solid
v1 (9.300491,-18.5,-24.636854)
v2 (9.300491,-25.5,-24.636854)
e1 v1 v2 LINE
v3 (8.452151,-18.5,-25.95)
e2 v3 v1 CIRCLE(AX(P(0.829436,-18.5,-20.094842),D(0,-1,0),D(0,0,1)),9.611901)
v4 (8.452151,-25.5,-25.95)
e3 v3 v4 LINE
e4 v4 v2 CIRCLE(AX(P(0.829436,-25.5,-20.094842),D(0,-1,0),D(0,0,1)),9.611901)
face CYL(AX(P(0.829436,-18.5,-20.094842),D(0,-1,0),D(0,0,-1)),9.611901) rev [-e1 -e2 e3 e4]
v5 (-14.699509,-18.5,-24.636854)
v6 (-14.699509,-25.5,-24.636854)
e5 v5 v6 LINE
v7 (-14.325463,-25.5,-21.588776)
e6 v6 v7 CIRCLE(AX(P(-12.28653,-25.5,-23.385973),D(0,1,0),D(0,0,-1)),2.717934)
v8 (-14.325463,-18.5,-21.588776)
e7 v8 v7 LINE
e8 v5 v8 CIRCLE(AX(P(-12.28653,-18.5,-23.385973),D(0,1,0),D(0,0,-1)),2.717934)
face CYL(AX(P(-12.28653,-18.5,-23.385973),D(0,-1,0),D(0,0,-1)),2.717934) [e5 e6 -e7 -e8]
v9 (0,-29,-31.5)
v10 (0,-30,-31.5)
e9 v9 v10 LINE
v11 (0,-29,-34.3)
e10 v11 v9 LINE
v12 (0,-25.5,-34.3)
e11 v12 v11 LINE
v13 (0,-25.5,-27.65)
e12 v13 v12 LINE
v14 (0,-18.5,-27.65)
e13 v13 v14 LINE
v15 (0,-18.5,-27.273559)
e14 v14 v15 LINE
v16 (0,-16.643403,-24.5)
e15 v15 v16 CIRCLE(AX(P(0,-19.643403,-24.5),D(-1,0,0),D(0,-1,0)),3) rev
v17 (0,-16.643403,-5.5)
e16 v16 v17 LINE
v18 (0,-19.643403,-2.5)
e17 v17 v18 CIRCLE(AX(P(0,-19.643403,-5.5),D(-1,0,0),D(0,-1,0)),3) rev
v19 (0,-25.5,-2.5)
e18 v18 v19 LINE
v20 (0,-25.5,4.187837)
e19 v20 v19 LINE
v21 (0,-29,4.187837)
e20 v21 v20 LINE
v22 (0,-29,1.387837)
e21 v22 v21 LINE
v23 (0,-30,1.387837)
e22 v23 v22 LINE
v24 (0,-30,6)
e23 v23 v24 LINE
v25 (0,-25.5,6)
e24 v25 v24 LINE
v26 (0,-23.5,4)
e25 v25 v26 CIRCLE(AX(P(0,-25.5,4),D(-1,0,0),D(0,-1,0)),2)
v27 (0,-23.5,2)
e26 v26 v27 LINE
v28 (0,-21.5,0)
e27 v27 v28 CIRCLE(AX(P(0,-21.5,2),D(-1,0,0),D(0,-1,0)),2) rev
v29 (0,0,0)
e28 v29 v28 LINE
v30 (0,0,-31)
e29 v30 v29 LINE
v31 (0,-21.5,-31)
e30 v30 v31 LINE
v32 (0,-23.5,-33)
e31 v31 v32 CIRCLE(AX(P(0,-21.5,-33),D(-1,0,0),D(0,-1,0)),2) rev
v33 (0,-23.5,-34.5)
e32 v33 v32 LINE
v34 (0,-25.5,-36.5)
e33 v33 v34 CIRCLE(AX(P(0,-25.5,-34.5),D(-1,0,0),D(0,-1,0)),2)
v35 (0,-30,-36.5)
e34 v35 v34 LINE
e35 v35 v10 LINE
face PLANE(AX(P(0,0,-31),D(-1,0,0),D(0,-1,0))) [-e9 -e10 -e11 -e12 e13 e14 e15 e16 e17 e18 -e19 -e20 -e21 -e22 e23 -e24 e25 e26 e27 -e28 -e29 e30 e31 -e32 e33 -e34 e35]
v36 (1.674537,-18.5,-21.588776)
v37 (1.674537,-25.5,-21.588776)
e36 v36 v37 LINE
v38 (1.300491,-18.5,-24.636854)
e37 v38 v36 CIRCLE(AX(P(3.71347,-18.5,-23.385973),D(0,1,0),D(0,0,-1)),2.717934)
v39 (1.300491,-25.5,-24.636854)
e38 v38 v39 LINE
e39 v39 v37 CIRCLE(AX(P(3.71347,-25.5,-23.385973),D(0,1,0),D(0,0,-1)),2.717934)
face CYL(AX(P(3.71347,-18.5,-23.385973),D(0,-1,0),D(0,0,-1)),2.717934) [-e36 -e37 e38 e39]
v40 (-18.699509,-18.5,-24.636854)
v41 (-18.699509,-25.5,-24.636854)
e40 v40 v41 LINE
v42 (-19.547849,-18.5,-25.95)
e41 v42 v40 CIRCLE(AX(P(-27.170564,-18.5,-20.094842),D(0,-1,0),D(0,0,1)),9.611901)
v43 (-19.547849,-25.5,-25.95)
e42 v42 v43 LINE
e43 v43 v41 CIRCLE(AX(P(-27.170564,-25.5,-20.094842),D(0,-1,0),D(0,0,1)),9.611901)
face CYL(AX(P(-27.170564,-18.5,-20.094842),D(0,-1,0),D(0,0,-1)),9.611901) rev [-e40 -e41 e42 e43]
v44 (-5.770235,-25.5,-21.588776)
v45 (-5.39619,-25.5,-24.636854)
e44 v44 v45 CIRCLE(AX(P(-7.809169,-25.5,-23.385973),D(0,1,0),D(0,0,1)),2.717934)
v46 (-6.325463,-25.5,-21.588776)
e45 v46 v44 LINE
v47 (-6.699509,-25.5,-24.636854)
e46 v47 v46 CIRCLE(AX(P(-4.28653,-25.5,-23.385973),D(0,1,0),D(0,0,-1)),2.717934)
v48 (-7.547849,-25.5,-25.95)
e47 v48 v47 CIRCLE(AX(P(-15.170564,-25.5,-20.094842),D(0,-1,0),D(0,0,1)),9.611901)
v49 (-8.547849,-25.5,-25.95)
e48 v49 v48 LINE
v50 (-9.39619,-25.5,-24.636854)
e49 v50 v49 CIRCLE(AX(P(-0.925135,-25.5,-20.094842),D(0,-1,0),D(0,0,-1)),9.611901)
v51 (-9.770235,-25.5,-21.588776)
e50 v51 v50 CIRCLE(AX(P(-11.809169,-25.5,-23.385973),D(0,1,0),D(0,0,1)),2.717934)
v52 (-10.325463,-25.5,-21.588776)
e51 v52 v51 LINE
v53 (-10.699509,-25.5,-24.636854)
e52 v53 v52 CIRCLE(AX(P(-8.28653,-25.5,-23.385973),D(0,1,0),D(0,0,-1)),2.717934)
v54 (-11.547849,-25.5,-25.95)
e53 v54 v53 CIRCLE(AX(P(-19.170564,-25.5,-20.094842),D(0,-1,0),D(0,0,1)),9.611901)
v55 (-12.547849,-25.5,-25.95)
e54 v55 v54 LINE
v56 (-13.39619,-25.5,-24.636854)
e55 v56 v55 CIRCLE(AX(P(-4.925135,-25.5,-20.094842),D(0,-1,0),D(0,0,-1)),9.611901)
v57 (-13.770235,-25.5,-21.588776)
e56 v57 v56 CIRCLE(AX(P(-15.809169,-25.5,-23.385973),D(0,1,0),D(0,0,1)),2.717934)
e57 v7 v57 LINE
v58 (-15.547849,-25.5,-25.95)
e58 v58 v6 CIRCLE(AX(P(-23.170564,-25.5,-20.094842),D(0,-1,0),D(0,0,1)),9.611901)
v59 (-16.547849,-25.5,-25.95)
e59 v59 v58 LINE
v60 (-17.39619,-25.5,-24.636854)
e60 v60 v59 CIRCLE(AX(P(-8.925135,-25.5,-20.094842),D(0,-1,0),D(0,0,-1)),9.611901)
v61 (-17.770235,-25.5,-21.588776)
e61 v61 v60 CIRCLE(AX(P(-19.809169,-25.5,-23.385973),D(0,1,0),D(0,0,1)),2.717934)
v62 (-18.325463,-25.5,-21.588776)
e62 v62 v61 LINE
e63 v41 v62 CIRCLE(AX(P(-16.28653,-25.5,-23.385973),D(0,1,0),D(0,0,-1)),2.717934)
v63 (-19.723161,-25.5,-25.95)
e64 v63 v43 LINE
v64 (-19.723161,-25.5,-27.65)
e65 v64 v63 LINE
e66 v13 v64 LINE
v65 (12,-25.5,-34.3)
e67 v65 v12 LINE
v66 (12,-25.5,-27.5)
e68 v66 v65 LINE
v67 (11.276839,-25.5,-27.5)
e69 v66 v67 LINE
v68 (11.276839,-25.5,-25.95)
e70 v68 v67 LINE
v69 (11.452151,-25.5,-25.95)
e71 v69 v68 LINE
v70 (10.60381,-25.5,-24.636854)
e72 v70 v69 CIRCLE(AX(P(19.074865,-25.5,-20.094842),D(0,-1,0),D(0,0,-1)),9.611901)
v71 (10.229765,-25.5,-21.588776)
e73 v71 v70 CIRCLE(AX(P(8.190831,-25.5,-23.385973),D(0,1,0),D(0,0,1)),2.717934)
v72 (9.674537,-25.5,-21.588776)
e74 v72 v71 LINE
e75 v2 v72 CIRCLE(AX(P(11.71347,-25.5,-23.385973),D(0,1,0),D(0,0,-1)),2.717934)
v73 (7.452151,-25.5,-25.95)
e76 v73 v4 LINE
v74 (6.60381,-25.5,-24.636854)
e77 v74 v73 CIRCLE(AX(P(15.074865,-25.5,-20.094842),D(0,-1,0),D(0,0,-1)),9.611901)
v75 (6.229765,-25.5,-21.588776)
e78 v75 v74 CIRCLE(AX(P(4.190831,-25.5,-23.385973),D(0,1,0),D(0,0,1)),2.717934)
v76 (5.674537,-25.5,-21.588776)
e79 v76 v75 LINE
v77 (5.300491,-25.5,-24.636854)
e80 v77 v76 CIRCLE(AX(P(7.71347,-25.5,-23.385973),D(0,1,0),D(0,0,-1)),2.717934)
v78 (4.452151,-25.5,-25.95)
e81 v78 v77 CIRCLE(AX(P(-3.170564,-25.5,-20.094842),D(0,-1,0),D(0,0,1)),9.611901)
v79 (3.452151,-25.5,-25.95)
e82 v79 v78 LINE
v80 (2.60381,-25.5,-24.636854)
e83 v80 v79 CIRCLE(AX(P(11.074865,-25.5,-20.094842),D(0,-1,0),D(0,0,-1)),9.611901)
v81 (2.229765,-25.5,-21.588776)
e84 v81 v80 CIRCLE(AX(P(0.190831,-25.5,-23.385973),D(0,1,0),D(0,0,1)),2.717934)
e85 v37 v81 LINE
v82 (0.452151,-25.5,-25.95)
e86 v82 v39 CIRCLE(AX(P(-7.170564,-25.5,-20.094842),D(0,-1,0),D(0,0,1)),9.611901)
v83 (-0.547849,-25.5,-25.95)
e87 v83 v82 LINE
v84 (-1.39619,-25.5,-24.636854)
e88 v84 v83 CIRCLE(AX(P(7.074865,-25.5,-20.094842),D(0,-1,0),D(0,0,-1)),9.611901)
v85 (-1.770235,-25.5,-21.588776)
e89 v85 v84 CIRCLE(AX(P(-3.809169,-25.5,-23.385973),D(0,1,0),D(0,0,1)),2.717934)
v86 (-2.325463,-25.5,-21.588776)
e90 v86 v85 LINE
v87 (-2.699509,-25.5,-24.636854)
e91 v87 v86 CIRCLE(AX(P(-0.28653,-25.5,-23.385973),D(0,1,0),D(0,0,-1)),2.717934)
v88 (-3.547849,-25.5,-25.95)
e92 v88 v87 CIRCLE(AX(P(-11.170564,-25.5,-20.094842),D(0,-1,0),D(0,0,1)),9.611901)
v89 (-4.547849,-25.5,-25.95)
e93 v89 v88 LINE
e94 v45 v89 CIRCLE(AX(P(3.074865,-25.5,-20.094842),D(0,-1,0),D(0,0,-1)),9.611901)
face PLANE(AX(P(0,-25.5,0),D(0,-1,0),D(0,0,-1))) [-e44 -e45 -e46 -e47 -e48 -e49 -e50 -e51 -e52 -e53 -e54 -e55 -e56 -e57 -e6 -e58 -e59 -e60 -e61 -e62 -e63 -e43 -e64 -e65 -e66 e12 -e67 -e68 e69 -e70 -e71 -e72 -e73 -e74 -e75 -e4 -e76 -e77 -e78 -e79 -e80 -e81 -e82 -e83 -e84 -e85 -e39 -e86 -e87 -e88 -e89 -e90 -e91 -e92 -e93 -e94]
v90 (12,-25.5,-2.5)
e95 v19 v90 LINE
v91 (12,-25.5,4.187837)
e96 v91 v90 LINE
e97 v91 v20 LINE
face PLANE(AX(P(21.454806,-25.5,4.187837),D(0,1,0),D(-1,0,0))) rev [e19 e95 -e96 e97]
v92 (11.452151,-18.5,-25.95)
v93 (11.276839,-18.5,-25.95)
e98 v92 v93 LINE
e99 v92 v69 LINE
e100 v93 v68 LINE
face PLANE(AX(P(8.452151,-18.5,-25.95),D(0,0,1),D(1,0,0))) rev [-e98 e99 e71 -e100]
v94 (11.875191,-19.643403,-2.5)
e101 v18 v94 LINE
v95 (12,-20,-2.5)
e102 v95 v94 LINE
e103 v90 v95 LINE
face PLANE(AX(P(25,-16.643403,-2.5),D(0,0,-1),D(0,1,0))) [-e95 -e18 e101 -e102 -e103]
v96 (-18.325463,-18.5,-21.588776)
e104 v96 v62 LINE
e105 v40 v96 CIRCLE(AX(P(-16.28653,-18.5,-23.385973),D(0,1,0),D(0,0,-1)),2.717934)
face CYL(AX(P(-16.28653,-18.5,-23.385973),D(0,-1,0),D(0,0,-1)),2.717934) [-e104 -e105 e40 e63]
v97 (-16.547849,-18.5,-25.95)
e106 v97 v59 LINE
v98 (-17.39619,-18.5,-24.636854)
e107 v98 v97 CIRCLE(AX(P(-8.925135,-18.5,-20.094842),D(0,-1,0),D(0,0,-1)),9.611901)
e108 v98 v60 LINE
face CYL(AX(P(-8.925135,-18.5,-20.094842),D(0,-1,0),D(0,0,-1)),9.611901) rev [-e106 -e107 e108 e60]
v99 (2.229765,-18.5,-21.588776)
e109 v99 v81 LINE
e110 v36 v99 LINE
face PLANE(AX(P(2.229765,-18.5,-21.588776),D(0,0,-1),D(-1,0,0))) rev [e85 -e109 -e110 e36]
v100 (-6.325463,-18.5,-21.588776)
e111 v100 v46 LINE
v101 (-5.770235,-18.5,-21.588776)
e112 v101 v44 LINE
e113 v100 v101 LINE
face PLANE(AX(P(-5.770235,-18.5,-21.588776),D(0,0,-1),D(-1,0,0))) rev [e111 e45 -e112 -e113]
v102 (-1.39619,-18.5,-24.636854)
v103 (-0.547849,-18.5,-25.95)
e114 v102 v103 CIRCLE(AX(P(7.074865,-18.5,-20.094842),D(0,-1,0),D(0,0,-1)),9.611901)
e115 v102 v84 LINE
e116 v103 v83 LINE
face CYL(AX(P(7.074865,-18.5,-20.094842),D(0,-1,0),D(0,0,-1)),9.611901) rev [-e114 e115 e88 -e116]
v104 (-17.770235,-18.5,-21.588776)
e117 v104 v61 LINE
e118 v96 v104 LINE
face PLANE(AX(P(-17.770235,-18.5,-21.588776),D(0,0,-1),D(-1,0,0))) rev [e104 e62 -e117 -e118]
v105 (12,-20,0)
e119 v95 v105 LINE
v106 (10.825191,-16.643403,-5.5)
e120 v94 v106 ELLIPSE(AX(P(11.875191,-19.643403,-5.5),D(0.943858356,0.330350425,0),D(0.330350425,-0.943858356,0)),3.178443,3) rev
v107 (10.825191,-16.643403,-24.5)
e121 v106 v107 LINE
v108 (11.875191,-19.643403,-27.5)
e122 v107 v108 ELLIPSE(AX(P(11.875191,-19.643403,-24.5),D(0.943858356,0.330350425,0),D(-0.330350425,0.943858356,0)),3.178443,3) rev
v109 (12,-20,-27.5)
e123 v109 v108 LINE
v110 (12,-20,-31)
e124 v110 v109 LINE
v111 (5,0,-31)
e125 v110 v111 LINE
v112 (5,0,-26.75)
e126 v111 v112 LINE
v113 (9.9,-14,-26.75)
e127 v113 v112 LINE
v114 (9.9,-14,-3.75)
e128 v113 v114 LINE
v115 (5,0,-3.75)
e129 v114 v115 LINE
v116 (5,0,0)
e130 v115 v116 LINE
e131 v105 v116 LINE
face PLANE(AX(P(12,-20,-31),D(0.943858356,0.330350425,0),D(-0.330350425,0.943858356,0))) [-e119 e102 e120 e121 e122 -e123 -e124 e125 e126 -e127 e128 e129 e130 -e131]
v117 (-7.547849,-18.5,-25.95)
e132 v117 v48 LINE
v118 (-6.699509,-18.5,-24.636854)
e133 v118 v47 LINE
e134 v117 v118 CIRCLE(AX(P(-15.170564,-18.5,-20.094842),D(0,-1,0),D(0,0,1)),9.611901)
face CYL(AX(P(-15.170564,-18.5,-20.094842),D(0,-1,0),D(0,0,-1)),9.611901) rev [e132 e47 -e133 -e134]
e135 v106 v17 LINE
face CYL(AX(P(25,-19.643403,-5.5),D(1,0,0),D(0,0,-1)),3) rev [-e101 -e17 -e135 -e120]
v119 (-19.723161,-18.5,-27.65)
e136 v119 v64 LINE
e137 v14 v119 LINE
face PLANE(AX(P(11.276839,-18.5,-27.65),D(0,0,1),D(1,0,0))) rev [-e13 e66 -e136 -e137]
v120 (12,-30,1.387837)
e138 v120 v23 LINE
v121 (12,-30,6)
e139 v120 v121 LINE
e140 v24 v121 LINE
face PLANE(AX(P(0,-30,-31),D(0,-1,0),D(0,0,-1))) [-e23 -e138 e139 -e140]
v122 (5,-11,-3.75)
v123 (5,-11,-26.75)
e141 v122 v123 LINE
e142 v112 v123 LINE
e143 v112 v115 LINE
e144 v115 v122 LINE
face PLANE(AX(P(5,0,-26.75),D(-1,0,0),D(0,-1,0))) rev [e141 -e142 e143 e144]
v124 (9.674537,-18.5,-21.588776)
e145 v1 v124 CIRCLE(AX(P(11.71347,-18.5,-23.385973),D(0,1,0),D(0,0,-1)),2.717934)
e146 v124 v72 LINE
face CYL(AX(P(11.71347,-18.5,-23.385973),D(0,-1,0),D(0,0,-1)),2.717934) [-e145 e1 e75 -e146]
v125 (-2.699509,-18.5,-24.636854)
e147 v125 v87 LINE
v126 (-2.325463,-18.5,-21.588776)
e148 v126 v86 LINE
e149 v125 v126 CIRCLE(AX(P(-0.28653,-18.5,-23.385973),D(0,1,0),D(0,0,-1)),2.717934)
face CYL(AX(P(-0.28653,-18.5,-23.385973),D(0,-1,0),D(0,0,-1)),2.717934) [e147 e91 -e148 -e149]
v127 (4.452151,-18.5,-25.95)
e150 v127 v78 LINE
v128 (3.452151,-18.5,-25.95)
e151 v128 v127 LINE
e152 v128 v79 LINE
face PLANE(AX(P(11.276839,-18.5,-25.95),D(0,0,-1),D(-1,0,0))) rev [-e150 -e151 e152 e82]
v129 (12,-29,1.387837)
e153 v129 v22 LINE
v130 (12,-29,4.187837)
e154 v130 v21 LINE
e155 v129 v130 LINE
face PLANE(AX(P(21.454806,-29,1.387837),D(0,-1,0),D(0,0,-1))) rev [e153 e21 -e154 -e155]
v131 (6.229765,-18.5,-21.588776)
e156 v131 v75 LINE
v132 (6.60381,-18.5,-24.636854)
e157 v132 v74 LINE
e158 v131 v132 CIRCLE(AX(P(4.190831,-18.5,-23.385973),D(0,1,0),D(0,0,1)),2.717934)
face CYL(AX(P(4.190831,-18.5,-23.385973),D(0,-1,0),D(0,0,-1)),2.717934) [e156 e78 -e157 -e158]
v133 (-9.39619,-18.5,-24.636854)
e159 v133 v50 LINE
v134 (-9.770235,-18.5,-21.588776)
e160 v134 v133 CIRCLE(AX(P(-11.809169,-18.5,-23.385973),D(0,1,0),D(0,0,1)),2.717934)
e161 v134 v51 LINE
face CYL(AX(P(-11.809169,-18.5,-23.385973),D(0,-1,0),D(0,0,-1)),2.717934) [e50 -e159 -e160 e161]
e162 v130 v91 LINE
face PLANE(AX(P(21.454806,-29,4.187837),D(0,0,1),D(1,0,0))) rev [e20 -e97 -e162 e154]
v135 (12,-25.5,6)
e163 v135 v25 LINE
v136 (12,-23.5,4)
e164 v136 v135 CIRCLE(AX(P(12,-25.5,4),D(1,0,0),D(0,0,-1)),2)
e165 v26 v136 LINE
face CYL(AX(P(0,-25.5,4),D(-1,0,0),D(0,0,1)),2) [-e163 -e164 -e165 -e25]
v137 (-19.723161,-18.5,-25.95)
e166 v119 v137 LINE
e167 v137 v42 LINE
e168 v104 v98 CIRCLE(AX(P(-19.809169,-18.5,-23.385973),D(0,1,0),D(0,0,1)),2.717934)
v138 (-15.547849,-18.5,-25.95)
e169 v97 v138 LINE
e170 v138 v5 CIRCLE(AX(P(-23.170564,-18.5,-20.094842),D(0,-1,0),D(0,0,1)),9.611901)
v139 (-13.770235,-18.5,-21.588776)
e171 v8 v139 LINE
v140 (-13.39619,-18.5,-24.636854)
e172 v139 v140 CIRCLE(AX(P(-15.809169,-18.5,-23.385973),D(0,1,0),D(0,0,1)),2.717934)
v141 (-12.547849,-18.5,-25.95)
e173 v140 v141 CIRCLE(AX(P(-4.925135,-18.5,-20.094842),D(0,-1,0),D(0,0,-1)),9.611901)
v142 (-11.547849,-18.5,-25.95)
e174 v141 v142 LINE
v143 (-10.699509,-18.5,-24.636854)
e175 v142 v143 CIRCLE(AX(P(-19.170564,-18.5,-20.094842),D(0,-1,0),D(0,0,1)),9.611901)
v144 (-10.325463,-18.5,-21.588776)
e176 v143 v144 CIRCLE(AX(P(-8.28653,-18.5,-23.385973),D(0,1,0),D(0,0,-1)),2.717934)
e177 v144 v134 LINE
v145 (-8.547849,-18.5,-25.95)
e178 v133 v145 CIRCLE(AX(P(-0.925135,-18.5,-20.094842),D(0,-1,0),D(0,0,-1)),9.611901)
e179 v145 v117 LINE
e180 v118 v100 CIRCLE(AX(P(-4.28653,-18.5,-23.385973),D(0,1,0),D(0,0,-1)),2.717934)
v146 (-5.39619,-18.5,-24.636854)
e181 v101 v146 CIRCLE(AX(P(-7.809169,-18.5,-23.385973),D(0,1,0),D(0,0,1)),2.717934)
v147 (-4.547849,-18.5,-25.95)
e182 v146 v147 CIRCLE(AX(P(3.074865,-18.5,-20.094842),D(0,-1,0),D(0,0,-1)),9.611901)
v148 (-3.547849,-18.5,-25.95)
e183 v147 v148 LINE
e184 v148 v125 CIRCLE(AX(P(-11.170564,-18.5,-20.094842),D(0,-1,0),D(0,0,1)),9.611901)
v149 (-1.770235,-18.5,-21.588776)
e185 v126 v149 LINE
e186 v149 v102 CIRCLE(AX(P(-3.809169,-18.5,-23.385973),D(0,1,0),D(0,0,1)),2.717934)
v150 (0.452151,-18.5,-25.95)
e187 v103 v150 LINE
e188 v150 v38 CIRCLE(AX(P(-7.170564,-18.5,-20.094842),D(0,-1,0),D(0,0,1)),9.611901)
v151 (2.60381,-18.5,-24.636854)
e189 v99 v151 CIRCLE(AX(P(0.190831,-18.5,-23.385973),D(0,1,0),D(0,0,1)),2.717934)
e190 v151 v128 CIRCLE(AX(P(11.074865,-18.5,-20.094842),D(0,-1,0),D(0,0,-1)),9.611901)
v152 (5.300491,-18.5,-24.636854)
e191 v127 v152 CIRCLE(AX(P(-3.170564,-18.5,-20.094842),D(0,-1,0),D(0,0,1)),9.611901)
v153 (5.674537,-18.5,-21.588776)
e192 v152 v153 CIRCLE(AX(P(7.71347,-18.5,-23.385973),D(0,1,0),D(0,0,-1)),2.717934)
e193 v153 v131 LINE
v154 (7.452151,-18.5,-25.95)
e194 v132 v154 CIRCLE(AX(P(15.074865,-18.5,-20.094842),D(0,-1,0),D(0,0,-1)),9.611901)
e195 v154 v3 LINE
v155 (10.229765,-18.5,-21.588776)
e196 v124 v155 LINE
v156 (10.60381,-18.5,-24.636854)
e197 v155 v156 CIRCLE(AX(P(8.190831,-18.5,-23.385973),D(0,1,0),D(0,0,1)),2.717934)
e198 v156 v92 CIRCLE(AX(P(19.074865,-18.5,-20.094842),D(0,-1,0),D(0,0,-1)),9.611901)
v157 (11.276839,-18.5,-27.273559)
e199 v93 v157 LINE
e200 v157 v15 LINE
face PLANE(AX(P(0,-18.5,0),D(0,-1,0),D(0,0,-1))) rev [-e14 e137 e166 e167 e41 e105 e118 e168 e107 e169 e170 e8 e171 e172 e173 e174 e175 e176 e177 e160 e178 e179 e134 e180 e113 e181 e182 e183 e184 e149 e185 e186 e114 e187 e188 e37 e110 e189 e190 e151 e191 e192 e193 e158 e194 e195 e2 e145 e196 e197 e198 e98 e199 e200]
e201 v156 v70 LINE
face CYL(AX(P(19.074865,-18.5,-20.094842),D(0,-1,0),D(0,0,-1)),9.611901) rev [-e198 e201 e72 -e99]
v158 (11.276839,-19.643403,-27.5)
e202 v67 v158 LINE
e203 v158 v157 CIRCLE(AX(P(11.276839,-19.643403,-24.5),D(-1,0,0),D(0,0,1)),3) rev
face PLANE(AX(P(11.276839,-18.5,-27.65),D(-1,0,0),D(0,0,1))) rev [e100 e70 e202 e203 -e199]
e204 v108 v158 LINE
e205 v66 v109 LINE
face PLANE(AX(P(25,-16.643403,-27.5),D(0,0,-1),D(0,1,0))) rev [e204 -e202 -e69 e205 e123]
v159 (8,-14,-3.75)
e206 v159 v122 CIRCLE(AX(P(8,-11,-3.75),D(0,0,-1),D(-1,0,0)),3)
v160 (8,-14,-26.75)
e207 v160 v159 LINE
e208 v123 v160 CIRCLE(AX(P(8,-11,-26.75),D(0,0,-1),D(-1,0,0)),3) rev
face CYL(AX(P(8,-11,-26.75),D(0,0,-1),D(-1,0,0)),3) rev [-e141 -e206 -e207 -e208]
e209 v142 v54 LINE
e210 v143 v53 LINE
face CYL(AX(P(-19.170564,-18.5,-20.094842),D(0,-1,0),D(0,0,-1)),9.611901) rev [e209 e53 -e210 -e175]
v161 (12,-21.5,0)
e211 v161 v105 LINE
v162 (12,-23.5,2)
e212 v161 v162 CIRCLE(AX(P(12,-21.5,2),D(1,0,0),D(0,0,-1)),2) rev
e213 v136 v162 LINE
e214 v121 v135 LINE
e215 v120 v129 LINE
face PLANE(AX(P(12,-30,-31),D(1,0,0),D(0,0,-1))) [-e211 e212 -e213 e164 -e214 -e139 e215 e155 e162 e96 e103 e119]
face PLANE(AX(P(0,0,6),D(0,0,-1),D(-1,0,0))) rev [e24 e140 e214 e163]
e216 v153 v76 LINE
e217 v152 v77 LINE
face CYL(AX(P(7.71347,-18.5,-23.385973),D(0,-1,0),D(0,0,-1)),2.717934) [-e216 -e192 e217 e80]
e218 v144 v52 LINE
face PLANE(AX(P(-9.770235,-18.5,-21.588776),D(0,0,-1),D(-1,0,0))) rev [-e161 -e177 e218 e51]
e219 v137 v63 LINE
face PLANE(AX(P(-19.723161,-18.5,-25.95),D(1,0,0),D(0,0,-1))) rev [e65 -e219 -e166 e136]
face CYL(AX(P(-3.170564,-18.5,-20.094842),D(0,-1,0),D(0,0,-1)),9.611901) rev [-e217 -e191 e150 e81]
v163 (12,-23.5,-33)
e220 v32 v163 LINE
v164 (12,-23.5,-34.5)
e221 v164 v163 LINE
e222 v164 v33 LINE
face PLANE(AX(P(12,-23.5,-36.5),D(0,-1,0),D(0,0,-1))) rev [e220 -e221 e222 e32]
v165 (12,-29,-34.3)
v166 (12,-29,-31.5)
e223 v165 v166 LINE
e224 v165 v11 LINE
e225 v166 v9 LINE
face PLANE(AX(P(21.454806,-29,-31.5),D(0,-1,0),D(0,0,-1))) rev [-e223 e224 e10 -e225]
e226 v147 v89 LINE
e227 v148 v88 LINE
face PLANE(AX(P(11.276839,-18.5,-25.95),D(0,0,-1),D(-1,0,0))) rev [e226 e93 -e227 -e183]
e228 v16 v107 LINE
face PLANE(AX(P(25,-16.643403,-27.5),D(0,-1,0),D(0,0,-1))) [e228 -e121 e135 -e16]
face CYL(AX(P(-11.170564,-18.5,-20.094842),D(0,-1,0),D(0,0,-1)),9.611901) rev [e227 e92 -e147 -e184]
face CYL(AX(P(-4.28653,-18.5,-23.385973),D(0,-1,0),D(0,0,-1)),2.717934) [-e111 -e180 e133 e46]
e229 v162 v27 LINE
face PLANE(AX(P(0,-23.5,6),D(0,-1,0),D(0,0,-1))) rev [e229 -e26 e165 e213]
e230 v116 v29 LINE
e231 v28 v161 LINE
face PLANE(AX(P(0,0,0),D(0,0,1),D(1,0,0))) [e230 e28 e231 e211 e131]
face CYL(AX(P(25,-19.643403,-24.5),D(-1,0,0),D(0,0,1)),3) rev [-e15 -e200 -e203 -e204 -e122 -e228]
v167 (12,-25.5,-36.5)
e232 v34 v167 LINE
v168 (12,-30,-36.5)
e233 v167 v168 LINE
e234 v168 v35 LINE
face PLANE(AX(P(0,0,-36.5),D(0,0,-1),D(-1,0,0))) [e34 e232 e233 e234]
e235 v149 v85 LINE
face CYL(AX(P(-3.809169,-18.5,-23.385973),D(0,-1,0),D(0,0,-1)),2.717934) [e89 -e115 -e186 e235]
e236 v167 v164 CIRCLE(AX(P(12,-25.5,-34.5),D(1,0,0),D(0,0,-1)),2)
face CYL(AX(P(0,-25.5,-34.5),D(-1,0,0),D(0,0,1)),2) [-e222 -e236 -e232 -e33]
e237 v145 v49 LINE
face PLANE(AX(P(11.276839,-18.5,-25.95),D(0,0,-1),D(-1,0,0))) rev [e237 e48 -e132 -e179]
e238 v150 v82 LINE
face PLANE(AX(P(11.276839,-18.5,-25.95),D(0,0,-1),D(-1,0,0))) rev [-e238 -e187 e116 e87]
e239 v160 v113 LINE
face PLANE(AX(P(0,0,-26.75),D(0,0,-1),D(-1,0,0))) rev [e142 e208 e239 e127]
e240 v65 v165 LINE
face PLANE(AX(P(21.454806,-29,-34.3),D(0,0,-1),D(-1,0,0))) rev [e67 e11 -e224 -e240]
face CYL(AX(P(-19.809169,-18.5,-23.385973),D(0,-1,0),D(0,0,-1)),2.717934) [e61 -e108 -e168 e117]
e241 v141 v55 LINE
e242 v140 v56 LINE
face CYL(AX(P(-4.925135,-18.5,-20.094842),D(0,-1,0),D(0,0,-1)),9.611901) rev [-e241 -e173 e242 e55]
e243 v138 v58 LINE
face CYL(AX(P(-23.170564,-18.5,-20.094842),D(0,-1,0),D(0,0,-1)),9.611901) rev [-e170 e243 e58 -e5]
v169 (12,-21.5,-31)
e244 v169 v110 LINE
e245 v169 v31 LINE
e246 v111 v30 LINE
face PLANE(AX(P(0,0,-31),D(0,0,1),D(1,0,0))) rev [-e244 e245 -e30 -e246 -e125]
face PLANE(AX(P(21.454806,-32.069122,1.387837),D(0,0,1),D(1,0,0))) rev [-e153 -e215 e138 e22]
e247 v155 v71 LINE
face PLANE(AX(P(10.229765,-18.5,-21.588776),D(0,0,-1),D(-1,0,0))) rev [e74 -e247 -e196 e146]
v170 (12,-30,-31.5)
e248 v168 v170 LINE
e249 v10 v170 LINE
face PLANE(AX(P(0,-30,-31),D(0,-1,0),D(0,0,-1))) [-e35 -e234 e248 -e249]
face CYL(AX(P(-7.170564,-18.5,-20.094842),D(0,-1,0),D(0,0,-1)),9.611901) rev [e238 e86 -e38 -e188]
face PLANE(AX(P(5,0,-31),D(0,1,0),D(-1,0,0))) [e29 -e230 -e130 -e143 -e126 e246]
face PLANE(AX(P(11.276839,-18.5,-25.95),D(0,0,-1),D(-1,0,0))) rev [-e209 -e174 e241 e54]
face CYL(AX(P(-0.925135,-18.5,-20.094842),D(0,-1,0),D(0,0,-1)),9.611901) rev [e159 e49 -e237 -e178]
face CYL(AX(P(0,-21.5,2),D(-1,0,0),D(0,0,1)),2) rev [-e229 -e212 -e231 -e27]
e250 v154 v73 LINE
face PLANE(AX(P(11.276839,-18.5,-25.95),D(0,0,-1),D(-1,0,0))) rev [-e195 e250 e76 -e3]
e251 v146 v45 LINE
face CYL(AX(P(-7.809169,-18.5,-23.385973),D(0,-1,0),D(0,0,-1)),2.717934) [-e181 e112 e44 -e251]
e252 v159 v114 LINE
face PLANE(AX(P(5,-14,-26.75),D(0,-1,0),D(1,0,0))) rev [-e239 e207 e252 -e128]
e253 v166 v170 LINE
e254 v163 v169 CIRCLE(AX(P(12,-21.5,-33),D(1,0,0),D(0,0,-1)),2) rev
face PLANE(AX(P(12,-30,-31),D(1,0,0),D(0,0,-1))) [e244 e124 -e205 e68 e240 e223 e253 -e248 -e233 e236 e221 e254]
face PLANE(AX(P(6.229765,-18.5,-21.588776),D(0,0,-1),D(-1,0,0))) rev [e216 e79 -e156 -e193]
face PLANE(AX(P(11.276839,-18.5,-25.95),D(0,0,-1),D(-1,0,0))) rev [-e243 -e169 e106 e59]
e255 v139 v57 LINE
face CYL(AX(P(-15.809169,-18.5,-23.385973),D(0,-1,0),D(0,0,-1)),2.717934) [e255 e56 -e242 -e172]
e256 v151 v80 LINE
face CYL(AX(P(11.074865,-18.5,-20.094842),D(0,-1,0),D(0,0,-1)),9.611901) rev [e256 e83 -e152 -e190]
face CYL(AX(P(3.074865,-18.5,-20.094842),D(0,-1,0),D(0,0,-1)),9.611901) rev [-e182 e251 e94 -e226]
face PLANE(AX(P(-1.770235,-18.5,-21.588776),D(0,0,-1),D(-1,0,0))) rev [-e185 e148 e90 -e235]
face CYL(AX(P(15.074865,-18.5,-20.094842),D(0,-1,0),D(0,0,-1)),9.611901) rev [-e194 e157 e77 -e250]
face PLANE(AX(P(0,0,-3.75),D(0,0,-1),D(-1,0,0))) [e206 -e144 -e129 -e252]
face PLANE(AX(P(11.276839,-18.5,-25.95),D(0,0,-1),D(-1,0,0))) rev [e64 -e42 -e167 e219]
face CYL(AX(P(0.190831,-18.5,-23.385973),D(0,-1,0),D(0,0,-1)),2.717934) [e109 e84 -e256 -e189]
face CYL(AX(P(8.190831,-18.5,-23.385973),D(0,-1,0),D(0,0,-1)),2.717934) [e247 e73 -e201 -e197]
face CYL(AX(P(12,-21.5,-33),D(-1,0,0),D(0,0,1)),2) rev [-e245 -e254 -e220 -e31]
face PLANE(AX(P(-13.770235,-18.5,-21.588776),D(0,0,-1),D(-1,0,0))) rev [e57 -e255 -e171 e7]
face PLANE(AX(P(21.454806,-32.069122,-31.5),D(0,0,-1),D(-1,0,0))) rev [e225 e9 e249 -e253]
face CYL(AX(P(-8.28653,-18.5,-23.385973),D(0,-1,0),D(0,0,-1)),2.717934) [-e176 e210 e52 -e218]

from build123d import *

# Parameters (mm, degrees)
BOSS_EXTRUDE1_DEPTH = 31
SKETCH4_W           = 25
SKETCH4_H           = 15
CUT_EXTRUDE2_DEPTH  = 25
CUT_EXTRUDE4_DEPTH  = 11.5
SKETCH7_W           = 31
SKETCH7_H           = 1.7
BOSS_EXTRUDE3_DEPTH = 7
BOSS_EXTRUDE4_DEPTH = 7
LPATTERN1_COUNT     = 8
LPATTERN1_PITCH     = 4
SKETCH11_W          = 12
SKETCH11_H          = 6.5
BOSS_EXTRUDE5_DEPTH = 5.5
FILLET5_R           = 3
SKETCH12_W          = 12
SKETCH12_H          = 6.5
BOSS_EXTRUDE6_DEPTH = 6
CUT_EXTRUDE5_DEPTH  = 12
FILLET6_R           = 2


with BuildPart() as part:
    # Sketch1 → Boss-Extrude1 (new body)
    with BuildSketch(Plane.XY):
        Polygon((0, 0), (0, -30), (12, -30), (12, -20), (5, 0), align=None)
    extrude(amount=-BOSS_EXTRUDE1_DEPTH)

    # Sketch4 → Cut-Extrude2 (cut)
    with BuildSketch(Plane.ZY):
        with Locations((-15, -24.143402944)):
            Rectangle(SKETCH4_W, SKETCH4_H)
    extrude(amount=-CUT_EXTRUDE2_DEPTH, mode=Mode.SUBTRACT)

    # Sketch6 → Cut-Extrude4 (cut, symmetric)
    with BuildSketch(Plane.XY.offset(-15.25)):
        Polygon((5, 0), (5, -14), (9.9, -14), align=None)
    extrude(amount=CUT_EXTRUDE4_DEPTH, both=True, mode=Mode.SUBTRACT)

    # Sketch7 → Boss-Extrude3 (add)
    with BuildSketch(Plane(origin=(0, -25.5, 0), x_dir=(1, 0, 0), z_dir=(0, 1, 0))):
        with Locations((-4.2231607, 26.8)):
            Rectangle(SKETCH7_W, SKETCH7_H)
    extrude(amount=BOSS_EXTRUDE3_DEPTH)

    # Sketch10 → Boss-Extrude4 (add)
    with BuildSketch(Plane(origin=(0, -25.5, 0), x_dir=(1, 0, 0), z_dir=(0, 1, 0))):
        with BuildLine():
            Line((10.229764516, 21.588776044), (9.674536509, 21.588776044))
            ThreePointArc((9.674536509, 21.588776044), (9.015771799, 23.054925169), (9.300491414, 24.636854036))
            ThreePointArc((9.300491414, 24.636854036), (8.903062553, 25.310703075), (8.452150513, 25.95))
            Line((8.452150513, 25.95), (11.452150513, 25.95))
            ThreePointArc((11.452150513, 25.95), (11.001238473, 25.310703075), (10.603809612, 24.636854036))
            ThreePointArc((10.603809612, 24.636854036), (10.888529227, 23.054925169), (10.229764516, 21.588776044))
        make_face()
    boss_extrude4 = extrude(amount=BOSS_EXTRUDE4_DEPTH)

    # LPattern1: Boss-Extrude4 ×8
    with Locations(*[(-i * LPATTERN1_PITCH, 0, 0) for i in range(1, LPATTERN1_COUNT)]):
        add(boss_extrude4)

    # Sketch11 → Boss-Extrude5 (add)
    with BuildSketch(Plane(origin=(0, 0, -31), x_dir=(-1, 0, 0), z_dir=(0, 0, -1))):
        with Locations((-6, -26.75)):
            Rectangle(SKETCH11_W, SKETCH11_H)
    extrude(amount=BOSS_EXTRUDE5_DEPTH)

    # Fillet5
    # the kernel refuses this fillet: 3 mm, written as the material it adds along each edge
    with BuildSketch(Plane(origin=(5, -14, -34.25), x_dir=(0, 1, 0), z_dir=(0, 0, 1))) as fillet5_piece_1_section:
        with BuildLine():
            CenterArc((FILLET5_R, -FILLET5_R), FILLET5_R, 90, 90)
            Line((0, -FILLET5_R), (0, 0))
            Line((0, 0), (FILLET5_R, 0))
        make_face()
    fillet5_piece_1 = extrude(amount=38, mode=Mode.PRIVATE)
    fillet5_piece_1 = split(fillet5_piece_1, bisect_by=Plane(origin=(5.670103817, -13.329896183, -31), z_dir=(0, 0, 1)), keep=Keep.TOP, mode=Mode.PRIVATE)
    fillet5_piece_1 = split(fillet5_piece_1, bisect_by=Plane(origin=(5.670103817, -13.329896183, 0), z_dir=(0, 0, -1)), keep=Keep.TOP, mode=Mode.PRIVATE)
    add(fillet5_piece_1)
    with BuildSketch(Plane(origin=(0, -16.643402944, -2.5), x_dir=(0, -1, 0), z_dir=(1, 0, 0))) as fillet5_piece_2_section:
        with BuildLine():
            CenterArc((FILLET5_R, FILLET5_R), FILLET5_R, 180, 90)
            Line((0, FILLET5_R), (0, 0))
            Line((0, 0), (FILLET5_R, 0))
        make_face()
    fillet5_piece_2 = extrude(amount=18.32519103, mode=Mode.PRIVATE)
    fillet5_piece_2 = split(fillet5_piece_2, bisect_by=Plane(origin=(10.459559167, -15.598740478, -3.164212855), z_dir=(-0.9438583563660173, -0.33035042472810633, 0)), keep=Keep.TOP, mode=Mode.PRIVATE)
    add(fillet5_piece_2)
    with BuildSketch(Plane(origin=(0, -16.643402944, -27.5), x_dir=(0, 0, 1), z_dir=(1, 0, 0))) as fillet5_piece_3_section:
        with BuildLine():
            CenterArc((FILLET5_R, FILLET5_R), FILLET5_R, 180, 90)
            Line((0, FILLET5_R), (0, 0))
            Line((0, 0), (FILLET5_R, 0))
        make_face()
    fillet5_piece_3 = extrude(amount=18.32519103, mode=Mode.PRIVATE)
    fillet5_piece_3 = split(fillet5_piece_3, bisect_by=Plane(origin=(10.435387917, -15.529679764, -26.806522223), z_dir=(-0.9438583563660173, -0.33035042472810633, 0)), keep=Keep.TOP, mode=Mode.PRIVATE)
    add(fillet5_piece_3)

    # Sketch12 → Boss-Extrude6 (add)
    with BuildSketch(Plane.XY):
        with Locations((6, -26.75)):
            Rectangle(SKETCH12_W, SKETCH12_H)
    extrude(amount=BOSS_EXTRUDE6_DEPTH)

    # Sketch13 → Cut-Extrude5 (cut)
    with BuildSketch(Plane.ZY):
        Polygon((-34.3, -25.5), (-27.5, -25.5), (-27.5, -32.069121633), (-31.5, -32.069121633), (-31.5, -29), (-34.3, -29), align=None)
        Polygon((1.387837299, -29), (4.187837299, -29), (4.187837299, -25.5), (-2.612162701, -25.5), (-2.612162701, -32.069121633), (1.387837299, -32.069121633), align=None)
    extrude(amount=-CUT_EXTRUDE5_DEPTH, mode=Mode.SUBTRACT)

    # Fillet6
    fillet6_edges = [part.edges().sort_by_distance(p)[0] for p in [
        (6, -23.5, -31),
        (6, -23.5, -36.5),
        (6, -23.5, 0),
        (6, -23.5, 6),
    ]]
    fillet(fillet6_edges, radius=FILLET6_R)


solid = part.part
